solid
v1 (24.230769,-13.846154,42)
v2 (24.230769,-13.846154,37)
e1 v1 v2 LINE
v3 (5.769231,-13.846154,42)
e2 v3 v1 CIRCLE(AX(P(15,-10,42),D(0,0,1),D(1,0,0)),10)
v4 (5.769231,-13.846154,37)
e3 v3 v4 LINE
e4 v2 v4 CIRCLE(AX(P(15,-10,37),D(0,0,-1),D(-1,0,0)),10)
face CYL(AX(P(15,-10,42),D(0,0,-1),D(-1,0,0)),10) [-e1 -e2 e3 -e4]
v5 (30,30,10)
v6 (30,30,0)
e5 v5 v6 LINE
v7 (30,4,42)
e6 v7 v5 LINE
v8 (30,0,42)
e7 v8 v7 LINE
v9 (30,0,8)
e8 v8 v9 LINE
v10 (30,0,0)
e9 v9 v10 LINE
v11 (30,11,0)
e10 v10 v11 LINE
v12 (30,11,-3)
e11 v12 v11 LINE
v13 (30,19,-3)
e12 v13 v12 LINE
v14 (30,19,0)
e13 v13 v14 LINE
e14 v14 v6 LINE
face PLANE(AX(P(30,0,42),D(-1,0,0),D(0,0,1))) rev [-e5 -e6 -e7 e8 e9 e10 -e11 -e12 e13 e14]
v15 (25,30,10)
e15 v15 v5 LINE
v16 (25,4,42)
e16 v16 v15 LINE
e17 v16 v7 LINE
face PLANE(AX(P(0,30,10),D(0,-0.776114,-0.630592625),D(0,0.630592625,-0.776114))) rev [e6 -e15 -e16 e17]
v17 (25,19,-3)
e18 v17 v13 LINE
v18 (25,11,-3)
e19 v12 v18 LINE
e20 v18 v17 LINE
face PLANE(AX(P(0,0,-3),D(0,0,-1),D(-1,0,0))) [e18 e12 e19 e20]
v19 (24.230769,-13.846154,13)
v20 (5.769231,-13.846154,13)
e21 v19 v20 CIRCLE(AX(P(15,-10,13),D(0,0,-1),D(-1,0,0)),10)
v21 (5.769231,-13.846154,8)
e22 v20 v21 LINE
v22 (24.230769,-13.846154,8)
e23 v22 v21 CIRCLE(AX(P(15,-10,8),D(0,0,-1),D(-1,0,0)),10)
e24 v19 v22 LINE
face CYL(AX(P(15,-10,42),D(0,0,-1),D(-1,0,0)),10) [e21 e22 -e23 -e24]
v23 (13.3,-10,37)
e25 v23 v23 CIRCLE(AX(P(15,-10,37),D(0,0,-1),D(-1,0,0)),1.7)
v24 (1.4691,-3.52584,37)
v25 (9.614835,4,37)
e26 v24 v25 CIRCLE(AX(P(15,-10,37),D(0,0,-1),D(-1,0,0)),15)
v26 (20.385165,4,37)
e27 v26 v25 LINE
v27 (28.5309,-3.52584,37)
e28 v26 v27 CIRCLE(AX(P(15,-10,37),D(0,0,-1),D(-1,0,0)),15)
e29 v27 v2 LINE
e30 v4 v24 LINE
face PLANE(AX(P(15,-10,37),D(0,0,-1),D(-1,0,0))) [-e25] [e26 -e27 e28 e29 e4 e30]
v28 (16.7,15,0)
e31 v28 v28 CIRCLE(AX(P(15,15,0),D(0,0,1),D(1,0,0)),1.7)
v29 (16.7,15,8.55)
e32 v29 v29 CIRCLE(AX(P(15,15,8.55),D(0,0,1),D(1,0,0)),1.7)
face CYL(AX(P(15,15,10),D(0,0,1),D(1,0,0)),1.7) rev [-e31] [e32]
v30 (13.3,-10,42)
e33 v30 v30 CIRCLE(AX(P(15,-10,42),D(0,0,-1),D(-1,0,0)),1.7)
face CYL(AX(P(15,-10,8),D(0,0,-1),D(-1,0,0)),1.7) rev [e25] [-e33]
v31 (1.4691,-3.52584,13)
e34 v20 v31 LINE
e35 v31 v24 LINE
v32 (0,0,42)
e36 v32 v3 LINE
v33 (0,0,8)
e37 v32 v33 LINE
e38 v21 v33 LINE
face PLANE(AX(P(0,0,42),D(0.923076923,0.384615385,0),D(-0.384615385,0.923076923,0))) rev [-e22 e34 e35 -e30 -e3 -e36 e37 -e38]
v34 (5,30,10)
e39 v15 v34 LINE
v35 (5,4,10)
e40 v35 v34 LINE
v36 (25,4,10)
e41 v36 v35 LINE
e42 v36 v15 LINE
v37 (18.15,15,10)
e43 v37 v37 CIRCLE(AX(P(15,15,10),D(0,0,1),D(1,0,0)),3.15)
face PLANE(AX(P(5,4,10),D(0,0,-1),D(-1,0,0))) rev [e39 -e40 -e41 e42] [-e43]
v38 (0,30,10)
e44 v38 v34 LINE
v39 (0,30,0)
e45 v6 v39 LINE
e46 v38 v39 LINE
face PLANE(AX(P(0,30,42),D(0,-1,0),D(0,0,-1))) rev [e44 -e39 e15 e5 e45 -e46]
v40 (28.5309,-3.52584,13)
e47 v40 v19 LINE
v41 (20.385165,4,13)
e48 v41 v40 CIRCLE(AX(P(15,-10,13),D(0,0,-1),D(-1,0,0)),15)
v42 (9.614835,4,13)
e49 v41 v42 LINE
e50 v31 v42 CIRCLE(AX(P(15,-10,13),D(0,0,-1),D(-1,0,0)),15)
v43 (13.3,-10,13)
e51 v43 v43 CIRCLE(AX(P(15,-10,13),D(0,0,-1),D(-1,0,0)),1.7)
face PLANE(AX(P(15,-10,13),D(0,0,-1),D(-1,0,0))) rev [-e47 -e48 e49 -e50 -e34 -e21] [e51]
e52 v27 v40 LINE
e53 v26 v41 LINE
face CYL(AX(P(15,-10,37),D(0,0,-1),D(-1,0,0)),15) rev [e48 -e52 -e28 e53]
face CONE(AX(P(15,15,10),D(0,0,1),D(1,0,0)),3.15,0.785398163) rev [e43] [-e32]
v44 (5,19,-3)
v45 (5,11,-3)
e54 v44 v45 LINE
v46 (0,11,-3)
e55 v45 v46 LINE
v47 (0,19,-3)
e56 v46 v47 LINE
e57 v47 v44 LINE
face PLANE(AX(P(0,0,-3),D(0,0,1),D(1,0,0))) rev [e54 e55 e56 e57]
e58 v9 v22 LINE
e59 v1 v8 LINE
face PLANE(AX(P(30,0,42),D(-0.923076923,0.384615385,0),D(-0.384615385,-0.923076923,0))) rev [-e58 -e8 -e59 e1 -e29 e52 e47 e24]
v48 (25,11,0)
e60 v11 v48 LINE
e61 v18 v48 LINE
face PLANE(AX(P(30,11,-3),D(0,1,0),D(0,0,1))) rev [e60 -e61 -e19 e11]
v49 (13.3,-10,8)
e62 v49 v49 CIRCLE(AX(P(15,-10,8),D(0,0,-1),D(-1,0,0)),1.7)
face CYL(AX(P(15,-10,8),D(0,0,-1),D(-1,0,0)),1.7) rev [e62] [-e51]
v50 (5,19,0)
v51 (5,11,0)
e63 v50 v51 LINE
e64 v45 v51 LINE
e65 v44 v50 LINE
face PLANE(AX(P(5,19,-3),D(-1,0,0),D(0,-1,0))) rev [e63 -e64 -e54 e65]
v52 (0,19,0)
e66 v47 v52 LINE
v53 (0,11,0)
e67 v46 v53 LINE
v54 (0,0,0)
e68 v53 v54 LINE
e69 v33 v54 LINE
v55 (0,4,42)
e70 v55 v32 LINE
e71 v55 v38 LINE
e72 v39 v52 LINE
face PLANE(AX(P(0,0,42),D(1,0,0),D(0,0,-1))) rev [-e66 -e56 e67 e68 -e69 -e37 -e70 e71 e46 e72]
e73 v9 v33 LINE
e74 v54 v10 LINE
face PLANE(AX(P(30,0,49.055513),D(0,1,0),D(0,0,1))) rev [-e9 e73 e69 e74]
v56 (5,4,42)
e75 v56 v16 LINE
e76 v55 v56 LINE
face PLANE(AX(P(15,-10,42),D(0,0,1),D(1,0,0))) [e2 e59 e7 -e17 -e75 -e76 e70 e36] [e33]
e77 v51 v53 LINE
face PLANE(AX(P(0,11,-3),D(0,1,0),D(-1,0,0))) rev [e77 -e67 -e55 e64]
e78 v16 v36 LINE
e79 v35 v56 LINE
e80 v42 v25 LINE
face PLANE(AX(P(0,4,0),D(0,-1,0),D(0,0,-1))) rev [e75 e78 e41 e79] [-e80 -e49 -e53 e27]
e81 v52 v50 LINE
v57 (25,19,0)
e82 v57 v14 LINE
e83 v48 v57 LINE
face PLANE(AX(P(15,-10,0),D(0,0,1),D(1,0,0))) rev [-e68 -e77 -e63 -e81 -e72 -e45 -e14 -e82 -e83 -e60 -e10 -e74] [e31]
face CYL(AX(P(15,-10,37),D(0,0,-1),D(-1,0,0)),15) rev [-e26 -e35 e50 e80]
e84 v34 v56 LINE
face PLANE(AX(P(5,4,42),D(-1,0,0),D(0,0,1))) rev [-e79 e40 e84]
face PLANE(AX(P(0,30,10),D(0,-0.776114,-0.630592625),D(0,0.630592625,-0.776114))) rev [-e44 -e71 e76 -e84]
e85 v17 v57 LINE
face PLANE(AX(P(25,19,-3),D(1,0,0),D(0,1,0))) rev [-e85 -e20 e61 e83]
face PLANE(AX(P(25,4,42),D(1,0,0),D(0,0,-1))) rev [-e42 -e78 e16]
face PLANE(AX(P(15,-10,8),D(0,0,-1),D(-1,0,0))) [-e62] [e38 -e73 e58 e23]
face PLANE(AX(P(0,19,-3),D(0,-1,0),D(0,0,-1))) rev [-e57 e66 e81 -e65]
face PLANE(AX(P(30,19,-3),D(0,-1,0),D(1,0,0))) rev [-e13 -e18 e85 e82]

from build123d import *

# Parameters (mm, degrees)
EXTRUDE_1_DEPTH     = 42
SKETCH_2_R          = 15
CUT_EXTRUDE_1_DEPTH = 12
SKETCH_3_W          = 30
SKETCH_3_H          = 20
CUT_EXTRUDE_2_DEPTH = 8
SKETCH_4_W          = 5
SKETCH_4_H          = 8
EXTRUDE_2_DEPTH     = 3
OTHER_START         = 8
OTHER_1_OUTLINE_R   = 1.7
OTHER_1_DEPTH       = 34
SKETCH_7_W          = 20
SKETCH_7_H          = 32
CUT_EXTRUDE_6_DEPTH = 26
CUT_EXTRUDE_7_DEPTH = 60.699246226


# Read off the part's stored shape, not the designer's step: 高级异型孔1, 高级异型孔2
with BuildPart() as part:
    # 草图1 → 凸台-拉伸1 (new body)
    with BuildSketch(Plane.XY):
        with BuildLine():
            Line((0, 0), (5.769230769, -13.846153846))
            ThreePointArc((5.769230769, -13.846153846), (15, -20), (24.230769231, -13.846153846))
            Line((24.230769231, -13.846153846), (30, 0))
            Line((30, 0), (30, 30))
            Line((30, 30), (0, 30))
            Line((0, 30), (0, 0))
        make_face()
    extrude(amount=EXTRUDE_1_DEPTH)

    # 草图2 → 切除-拉伸1 (cut, symmetric)
    with BuildSketch(Plane(origin=(0, 0, 25), x_dir=(-1, 0, 0), z_dir=(0, 0, -1))):
        with Locations((-15, -10)):
            Circle(SKETCH_2_R)
    extrude(amount=CUT_EXTRUDE_1_DEPTH, both=True, mode=Mode.SUBTRACT)

    # 草图3 → 切除-拉伸2 (cut)
    with BuildSketch(Plane(origin=(0, 0, 0), x_dir=(-1, 0, 0), z_dir=(0, 0, -1))):
        with Locations((-15, -10)):
            Rectangle(SKETCH_3_W, SKETCH_3_H)
    extrude(amount=-CUT_EXTRUDE_2_DEPTH, mode=Mode.SUBTRACT)

    # 草图4 → 凸台-拉伸2 (add)
    with BuildSketch(Plane(origin=(0, 0, 0), x_dir=(-1, 0, 0), z_dir=(0, 0, -1))):
        with Locations((-27.5, 15)):
            Rectangle(SKETCH_4_W, SKETCH_4_H)
        with Locations((-2.5, 15)):
            Rectangle(SKETCH_4_W, SKETCH_4_H)
    extrude(amount=EXTRUDE_2_DEPTH)

    # 高级异型孔1 outline → 高级异型孔1 (cut)
    with BuildSketch(Plane.XY.offset(OTHER_START)):
        with Locations((15, -10)):
            Circle(OTHER_1_OUTLINE_R)
    extrude(amount=OTHER_1_DEPTH, mode=Mode.SUBTRACT)

    # 草图7 → 切除-拉伸6 (cut)
    with BuildSketch(Plane(origin=(0, 30, 0), x_dir=(1, 0, 0), z_dir=(0, 1, 0))):
        with Locations((15, -26)):
            Rectangle(SKETCH_7_W, SKETCH_7_H)
    extrude(amount=-CUT_EXTRUDE_6_DEPTH, mode=Mode.SUBTRACT)

    # 草图8 → 切除-拉伸7 (cut, through all)
    with BuildSketch(Plane(origin=(30, 0, 0), x_dir=(0, 0, -1), z_dir=(1, 0, 0))):
        Polygon((-42, 30), (-10, 30), (-42, 4), align=None)
    extrude(amount=-CUT_EXTRUDE_7_DEPTH, mode=Mode.SUBTRACT)

    # 高级异型孔2 outline → 高级异型孔2 (revolve, cut)
    with BuildSketch(Plane(origin=(15, 15, 0), x_dir=(1, 0, 0), z_dir=(0, -1, 0))):
        Polygon((0, 0), (1.7, 0), (1.7, 8.55), (3.15, 10), (0, 10), align=None)
    revolve(axis=Axis((15, 15, 0), (0, 0, 1)), mode=Mode.SUBTRACT)


solid = part.part
